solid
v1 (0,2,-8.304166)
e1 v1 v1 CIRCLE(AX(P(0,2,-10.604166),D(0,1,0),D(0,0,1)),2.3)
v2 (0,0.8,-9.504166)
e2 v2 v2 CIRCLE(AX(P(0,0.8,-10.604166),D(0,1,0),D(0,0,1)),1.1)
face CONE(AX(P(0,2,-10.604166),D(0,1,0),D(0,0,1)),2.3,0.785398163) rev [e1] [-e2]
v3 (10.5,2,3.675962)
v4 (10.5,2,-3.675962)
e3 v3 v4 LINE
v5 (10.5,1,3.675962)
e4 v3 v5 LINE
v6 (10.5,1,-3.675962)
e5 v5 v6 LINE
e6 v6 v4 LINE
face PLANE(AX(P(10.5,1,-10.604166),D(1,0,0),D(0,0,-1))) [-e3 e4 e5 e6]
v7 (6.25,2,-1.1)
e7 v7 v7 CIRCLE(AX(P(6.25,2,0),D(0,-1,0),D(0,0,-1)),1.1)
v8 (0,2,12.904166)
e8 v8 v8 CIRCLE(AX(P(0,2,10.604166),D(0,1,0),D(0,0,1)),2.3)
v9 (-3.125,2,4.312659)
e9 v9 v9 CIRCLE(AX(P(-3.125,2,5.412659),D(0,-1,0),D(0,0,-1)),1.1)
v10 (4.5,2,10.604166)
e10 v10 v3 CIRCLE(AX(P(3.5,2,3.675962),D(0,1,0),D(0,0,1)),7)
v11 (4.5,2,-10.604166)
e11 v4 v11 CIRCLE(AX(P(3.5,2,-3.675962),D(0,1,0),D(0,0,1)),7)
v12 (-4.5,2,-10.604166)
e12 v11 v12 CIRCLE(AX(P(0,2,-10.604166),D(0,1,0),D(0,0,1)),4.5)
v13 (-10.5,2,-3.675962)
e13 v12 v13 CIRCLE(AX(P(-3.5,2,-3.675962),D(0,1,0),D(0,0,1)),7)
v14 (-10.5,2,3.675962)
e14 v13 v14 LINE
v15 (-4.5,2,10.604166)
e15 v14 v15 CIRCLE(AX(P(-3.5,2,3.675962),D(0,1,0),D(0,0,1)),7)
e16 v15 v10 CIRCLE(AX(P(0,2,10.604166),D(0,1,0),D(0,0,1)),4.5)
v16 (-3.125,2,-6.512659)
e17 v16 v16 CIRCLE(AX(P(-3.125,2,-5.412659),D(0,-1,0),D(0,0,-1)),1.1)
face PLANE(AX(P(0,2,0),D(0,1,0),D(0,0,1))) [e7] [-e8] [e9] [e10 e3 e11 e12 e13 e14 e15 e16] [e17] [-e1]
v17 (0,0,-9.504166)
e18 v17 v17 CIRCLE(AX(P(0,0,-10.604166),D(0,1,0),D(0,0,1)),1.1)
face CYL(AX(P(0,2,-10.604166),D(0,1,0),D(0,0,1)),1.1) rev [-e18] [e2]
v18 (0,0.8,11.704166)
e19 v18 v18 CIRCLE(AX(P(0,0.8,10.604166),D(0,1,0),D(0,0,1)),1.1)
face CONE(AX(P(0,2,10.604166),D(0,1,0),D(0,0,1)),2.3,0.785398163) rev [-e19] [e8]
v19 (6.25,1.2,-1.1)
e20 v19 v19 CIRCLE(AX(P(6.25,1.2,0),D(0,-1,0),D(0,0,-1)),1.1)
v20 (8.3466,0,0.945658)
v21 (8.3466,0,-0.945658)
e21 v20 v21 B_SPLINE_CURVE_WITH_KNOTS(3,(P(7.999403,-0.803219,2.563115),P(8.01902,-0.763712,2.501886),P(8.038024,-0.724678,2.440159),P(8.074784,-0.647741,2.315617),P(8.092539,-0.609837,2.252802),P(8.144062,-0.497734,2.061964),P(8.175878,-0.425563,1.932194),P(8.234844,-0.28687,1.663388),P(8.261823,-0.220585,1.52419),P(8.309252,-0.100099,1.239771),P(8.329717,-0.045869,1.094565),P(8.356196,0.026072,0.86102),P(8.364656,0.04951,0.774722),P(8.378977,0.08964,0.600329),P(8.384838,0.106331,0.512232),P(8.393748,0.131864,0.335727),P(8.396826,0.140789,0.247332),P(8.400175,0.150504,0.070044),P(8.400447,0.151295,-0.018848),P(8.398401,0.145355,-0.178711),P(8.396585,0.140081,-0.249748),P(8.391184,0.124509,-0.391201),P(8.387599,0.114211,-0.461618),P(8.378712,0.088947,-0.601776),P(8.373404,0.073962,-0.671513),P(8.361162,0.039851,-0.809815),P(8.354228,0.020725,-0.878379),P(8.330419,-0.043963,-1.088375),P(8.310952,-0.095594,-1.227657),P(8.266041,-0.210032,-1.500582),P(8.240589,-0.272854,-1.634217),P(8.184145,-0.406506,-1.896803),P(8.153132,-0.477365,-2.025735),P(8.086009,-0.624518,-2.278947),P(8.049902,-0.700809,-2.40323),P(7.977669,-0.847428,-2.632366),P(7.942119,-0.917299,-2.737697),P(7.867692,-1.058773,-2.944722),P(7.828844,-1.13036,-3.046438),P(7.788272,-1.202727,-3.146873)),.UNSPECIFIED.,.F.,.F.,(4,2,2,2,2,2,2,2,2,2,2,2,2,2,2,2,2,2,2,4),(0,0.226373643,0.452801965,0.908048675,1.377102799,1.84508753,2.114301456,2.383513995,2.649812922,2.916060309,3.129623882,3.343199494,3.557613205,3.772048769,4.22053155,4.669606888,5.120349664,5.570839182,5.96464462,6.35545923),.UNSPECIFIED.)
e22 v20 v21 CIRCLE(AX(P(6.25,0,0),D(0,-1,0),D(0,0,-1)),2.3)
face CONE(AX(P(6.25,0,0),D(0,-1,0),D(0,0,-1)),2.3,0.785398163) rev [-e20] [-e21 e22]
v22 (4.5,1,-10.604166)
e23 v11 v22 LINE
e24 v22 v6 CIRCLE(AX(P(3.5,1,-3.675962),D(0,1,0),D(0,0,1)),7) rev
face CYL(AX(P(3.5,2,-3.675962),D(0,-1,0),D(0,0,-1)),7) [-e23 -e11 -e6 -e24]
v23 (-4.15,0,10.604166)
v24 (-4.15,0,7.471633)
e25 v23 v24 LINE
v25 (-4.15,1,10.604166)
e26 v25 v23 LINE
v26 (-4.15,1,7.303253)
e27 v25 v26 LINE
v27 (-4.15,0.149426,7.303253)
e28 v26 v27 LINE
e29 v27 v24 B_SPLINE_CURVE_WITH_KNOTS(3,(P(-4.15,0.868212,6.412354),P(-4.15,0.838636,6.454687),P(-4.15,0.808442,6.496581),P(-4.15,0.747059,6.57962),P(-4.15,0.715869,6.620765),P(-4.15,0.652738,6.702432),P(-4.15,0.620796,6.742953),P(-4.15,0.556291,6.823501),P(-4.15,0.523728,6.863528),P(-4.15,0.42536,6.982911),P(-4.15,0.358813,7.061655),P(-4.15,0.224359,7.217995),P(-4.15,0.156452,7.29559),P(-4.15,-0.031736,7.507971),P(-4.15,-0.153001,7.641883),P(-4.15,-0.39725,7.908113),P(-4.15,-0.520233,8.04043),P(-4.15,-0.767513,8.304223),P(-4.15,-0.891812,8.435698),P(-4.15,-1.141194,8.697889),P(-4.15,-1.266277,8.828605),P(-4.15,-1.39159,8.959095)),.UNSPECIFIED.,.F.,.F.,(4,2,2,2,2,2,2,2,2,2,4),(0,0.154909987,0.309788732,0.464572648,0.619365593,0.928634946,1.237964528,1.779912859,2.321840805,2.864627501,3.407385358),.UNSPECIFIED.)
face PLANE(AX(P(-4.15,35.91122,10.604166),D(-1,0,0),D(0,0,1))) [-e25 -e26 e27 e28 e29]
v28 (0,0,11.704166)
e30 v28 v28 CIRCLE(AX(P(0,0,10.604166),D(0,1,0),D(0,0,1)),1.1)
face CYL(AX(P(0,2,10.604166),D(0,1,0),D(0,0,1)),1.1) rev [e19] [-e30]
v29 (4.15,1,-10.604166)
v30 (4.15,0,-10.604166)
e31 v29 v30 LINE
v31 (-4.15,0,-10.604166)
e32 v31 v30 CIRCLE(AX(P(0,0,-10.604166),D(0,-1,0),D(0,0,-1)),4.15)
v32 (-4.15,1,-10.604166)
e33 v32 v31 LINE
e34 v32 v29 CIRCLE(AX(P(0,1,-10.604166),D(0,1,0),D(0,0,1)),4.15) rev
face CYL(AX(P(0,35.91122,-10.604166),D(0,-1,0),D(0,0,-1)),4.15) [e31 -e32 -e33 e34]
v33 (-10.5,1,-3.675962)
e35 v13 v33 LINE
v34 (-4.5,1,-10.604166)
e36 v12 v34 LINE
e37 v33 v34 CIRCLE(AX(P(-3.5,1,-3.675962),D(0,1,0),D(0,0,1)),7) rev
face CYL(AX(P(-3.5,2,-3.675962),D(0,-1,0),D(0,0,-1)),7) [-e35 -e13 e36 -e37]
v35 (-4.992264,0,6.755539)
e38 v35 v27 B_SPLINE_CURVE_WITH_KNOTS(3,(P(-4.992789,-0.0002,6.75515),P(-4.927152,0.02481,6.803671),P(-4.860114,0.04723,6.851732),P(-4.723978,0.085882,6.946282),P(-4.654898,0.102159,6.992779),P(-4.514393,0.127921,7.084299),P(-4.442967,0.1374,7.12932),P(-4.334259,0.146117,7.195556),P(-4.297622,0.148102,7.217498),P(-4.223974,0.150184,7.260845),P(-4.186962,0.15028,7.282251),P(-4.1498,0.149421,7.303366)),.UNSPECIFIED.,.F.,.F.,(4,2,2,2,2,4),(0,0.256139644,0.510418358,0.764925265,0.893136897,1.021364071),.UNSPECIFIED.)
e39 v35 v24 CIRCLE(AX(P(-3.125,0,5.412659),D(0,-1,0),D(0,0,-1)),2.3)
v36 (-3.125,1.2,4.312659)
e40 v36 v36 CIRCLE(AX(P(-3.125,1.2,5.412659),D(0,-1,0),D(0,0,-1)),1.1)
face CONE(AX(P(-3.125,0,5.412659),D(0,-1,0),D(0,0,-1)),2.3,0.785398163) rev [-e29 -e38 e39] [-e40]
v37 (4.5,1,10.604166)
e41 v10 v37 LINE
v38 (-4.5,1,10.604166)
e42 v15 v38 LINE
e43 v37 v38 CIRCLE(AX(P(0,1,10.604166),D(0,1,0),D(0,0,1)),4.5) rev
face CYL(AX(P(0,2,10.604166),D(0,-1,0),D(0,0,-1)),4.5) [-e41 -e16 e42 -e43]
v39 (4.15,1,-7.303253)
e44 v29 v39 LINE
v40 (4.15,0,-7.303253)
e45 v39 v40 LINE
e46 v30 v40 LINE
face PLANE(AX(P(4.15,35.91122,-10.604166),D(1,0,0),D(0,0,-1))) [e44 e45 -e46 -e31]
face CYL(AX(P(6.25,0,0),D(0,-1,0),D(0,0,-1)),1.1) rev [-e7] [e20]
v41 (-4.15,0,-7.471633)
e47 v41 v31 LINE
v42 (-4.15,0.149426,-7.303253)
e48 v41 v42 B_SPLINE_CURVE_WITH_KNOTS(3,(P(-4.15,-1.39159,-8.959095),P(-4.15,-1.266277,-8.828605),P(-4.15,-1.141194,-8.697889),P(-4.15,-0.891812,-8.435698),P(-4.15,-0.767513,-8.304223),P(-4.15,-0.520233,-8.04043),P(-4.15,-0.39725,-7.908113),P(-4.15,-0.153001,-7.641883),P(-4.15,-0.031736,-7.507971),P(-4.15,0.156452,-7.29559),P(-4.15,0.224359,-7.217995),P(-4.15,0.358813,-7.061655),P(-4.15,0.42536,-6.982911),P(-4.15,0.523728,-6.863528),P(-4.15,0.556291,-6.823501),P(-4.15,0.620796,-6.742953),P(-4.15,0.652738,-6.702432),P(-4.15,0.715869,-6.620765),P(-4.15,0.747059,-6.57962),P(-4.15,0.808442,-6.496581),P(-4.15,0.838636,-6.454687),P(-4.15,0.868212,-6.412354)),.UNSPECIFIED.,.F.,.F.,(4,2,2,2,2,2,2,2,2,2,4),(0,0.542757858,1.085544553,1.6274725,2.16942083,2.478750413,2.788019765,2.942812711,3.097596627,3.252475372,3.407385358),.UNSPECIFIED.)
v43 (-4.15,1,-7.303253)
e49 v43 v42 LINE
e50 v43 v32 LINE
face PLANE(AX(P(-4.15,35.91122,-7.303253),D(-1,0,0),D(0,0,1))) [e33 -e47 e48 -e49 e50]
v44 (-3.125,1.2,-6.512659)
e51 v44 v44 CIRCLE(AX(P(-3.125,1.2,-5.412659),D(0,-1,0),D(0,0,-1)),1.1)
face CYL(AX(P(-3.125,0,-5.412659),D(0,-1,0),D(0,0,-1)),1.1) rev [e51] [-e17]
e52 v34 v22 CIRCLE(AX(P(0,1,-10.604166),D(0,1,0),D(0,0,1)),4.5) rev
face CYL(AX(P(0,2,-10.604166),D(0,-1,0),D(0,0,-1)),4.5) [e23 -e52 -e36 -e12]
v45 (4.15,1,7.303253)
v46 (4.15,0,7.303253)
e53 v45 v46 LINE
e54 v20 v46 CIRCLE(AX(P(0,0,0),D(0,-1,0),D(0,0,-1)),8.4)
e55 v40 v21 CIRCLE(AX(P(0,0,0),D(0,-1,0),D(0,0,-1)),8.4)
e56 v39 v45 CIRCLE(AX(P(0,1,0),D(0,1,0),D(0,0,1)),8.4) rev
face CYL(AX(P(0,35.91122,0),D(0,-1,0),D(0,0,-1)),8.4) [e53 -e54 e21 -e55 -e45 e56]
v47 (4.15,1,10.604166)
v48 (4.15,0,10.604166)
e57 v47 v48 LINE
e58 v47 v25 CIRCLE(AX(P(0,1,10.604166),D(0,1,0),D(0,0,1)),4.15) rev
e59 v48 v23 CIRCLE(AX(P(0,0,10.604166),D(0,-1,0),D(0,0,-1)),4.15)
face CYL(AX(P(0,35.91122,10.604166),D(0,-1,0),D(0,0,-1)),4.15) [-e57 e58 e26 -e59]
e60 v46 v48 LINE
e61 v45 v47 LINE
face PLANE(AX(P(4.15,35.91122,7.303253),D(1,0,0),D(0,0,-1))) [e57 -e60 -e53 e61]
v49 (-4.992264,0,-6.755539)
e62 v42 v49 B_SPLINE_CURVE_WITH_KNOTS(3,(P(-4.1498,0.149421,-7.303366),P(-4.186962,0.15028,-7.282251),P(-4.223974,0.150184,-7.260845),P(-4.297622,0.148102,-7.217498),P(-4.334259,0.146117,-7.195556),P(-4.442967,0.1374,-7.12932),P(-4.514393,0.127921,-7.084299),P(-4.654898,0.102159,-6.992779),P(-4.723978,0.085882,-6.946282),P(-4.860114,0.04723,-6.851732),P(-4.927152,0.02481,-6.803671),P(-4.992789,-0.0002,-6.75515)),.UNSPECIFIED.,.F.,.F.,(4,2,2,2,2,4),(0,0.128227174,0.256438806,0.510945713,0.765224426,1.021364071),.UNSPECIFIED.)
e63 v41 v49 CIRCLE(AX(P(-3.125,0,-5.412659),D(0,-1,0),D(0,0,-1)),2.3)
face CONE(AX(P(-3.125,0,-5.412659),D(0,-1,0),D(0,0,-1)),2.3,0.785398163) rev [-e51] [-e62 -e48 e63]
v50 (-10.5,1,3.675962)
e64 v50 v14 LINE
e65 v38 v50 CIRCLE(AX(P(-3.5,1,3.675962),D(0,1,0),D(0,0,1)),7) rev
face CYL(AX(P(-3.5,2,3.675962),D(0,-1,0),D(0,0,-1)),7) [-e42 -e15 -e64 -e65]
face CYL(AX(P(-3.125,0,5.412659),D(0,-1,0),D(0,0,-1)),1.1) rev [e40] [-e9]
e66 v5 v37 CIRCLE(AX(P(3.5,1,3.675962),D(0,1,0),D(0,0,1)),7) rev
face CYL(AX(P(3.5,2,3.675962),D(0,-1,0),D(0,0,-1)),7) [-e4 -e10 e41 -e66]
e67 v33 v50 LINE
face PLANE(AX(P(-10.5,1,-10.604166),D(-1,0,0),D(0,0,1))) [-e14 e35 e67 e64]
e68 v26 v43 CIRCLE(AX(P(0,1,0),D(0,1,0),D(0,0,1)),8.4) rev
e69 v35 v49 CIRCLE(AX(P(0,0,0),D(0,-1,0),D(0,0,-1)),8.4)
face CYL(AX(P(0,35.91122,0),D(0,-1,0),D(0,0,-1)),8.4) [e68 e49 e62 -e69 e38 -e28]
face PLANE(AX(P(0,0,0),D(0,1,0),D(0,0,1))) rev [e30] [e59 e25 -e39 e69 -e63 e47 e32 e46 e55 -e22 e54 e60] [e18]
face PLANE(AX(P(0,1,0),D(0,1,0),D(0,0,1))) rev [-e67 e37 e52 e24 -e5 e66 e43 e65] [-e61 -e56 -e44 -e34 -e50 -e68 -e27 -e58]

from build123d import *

# Parameters (mm, degrees)
BOSS_EXTRUDE1_DEPTH                          = 2
CSK_FOR_M2_COUNTERSUNK_FLAT_HEAD_SCR_4_COUNT = 2
CSK_FOR_M2_COUNTERSUNK_FLAT_HEAD_SCR_4_PITCH = 10.825317547
CSK_FOR_M2_COUNTERSUNK_FLAT_HEAD_SCR_5_COUNT = 2
CSK_FOR_M2_COUNTERSUNK_FLAT_HEAD_SCR_5_PITCH = 10.825317547
BOSS_EXTRUDE2_START                          = -1
BOSS_EXTRUDE2_DEPTH                          = 1
FILLET1_R                                    = 7
CUT_EXTRUDE1_DEPTH                           = 1


# Read off the part's stored shape, not the designer's step: CSK for M2 Countersunk Flat Head Screw1
with BuildPart() as part:
    # Sketch1 → Boss-Extrude1 (new body)
    with BuildSketch(Plane(origin=(0, 0, 0), x_dir=(1, 0, 0), z_dir=(0, 1, 0))):
        with BuildLine():
            Line((4.5, 10.60416551), (4.5, 7.50416551))
            ThreePointArc((4.5, 7.50416551), (8.75, 0), (4.5, -7.50416551))
            Line((4.5, -7.50416551), (4.5, -10.60416551))
            ThreePointArc((4.5, -10.60416551), (0, -15.10416551), (-4.5, -10.60416551))
            Line((-4.5, -10.60416551), (-4.5, -7.50416551))
            ThreePointArc((-4.5, -7.50416551), (-8.75, 0), (-4.5, 7.50416551))
            Line((-4.5, 7.50416551), (-4.5, 10.60416551))
            ThreePointArc((-4.5, 10.60416551), (0, 15.10416551), (4.5, 10.60416551))
        make_face()
    extrude(amount=BOSS_EXTRUDE1_DEPTH)

    # CSK for M2 Countersunk Flat Head Scr 2 → CSK for M2 Countersunk Flat Head Screw1 (revolve, cut)
    with BuildSketch(Plane.XY.offset(10.60416551)):
        Polygon((0, 0), (1.1, 0), (1.1, 0.8), (2.3, 2), (0, 2), align=None)
    revolve(axis=Axis((0, 0, 10.60416551), (0, 1, 0)), mode=Mode.SUBTRACT)

    # CSK for M2 Countersunk Flat Head Scr 3 o → CSK for M2 Countersunk Flat Head Scr 3 (revolve, cut)
    with BuildSketch(Plane.XY.offset(-10.60416551)):
        Polygon((0, 0), (1.1, 0), (1.1, 0.8), (2.3, 2), (0, 2), align=None)
    revolve(axis=Axis((0, 0, -10.60416551), (0, 1, 0)), mode=Mode.SUBTRACT)

    # Sketch6 → CSK for M2 Countersunk Flat Head Screw2 (revolve, cut)
    with BuildSketch(Plane(origin=(6.25, 0, 0), x_dir=(0, 0, -1), z_dir=(1, 0, 0))):
        Polygon((0, 0), (0, 2), (1.1, 2), (1.1, 1.2), (2.3, 0), align=None)
    csk_for_m2_countersunk_flat_head_screw2 = revolve(axis=Axis((6.25, -6.35, 0), (0, 1, 0)), mode=Mode.SUBTRACT)

    # CSK for M2 Countersunk Flat Head Scr 4: CSK for M2 Countersunk Flat Head Screw2 ×2
    with Locations(*[Vector(-0.8660254037844379, 0, -0.5000000000000012) * (i * CSK_FOR_M2_COUNTERSUNK_FLAT_HEAD_SCR_4_PITCH) for i in range(1, CSK_FOR_M2_COUNTERSUNK_FLAT_HEAD_SCR_4_COUNT)]):
        add(csk_for_m2_countersunk_flat_head_screw2, mode=Mode.SUBTRACT)

    # CSK for M2 Countersunk Flat Head Scr 5: CSK for M2 Countersunk Flat Head Screw2 ×2
    with Locations(*[Vector(-0.8660254037844383, 0, 0.5000000000000008) * (i * CSK_FOR_M2_COUNTERSUNK_FLAT_HEAD_SCR_5_PITCH) for i in range(1, CSK_FOR_M2_COUNTERSUNK_FLAT_HEAD_SCR_5_COUNT)]):
        add(csk_for_m2_countersunk_flat_head_screw2, mode=Mode.SUBTRACT)

    # Sketch7 → Boss-Extrude2 (add)
    with BuildSketch(Plane(origin=(0, 2, 0), x_dir=(1, 0, 0), z_dir=(0, 1, 0)).offset(BOSS_EXTRUDE2_START)):
        with BuildLine():
            Line((4.5, 10.60416551), (10.5, 10.60416551))
            Line((10.5, 10.60416551), (10.5, -10.60416551))
            Line((10.5, -10.60416551), (4.5, -10.60416551))
            Line((4.5, -10.60416551), (4.5, -7.50416551))
            ThreePointArc((4.5, -7.50416551), (8.75, 0), (4.5, 7.50416551))
            Line((4.5, 7.50416551), (4.5, 10.60416551))
        make_face()
        with BuildLine():
            Line((-4.5, -7.50416551), (-4.5, -10.60416551))
            Line((-4.5, -10.60416551), (-10.5, -10.60416551))
            Line((-10.5, -10.60416551), (-10.5, 10.60416551))
            Line((-10.5, 10.60416551), (-4.5, 10.60416551))
            Line((-4.5, 10.60416551), (-4.5, 7.50416551))
            ThreePointArc((-4.5, 7.50416551), (-8.75, 0), (-4.5, -7.50416551))
        make_face()
    extrude(amount=BOSS_EXTRUDE2_DEPTH)

    # Fillet1
    # the kernel refuses this fillet: 7 mm, written as the material it takes off along each edge
    with BuildSketch(Plane(origin=(-10.5, -16.320508076, -10.60416551), x_dir=(1, 0, 0), z_dir=(0, 1, 0))) as fillet1_piece_1:
        with BuildLine():
            CenterArc((7, -6.92820323), FILLET1_R, 98.213210702, 81.786789298)
            Line((0, -6.92820323), (-0.14, -6.92820323))
            Line((-0.14, -6.92820323), (-0.14, 0))
            Line((-0.14, 0), (0, 0.14))
            ThreePointArc((0, 0.14), (3, 0.14), (5.98, 0.138564065))
            Line((5.98, 0.138564065), (6, 0))
        make_face()
    extrude(amount=35.641016151, mode=Mode.SUBTRACT)
    with BuildSketch(Plane(origin=(-10.5, -16.320508076, 10.60416551), x_dir=(1, 0, 0), z_dir=(0, 1, 0)), Plane(origin=(10.5, -16.320508076, -10.60416551), x_dir=(-1, 0, 0), z_dir=(0, 1, 0))) as fillet1_piece_2:
        with BuildLine():
            CenterArc((7, 6.92820323), FILLET1_R, 180, 81.786789298)
            Line((0, 6.92820323), (-0.14, 6.92820323))
            Line((-0.14, 6.92820323), (-0.14, 0))
            Line((-0.14, 0), (0, -0.14))
            ThreePointArc((0, -0.14), (3, -0.14), (5.98, -0.138564065))
            Line((5.98, -0.138564065), (6, 0))
        make_face()
    extrude(amount=35.641016151, mode=Mode.SUBTRACT)
    with BuildSketch(Plane(origin=(10.5, -16.320508076, 10.60416551), x_dir=(0, 0, -1), z_dir=(0, 1, 0))) as fillet1_piece_3:
        with BuildLine():
            CenterArc((6.92820323, 7), FILLET1_R, 188.213210702, 81.786789298)
            Line((0, 6), (-0.138564065, 5.98))
            ThreePointArc((-0.138564065, 5.98), (-0.14, 3), (-0.14, 0))
            Line((-0.14, 0), (0, -0.14))
            Line((0, -0.14), (6.92820323, -0.14))
            Line((6.92820323, -0.14), (6.92820323, 0))
        make_face()
    extrude(amount=35.641016151, mode=Mode.SUBTRACT)

    # Sketch8 → Cut-Extrude1 (cut)
    with BuildSketch(Plane.XZ):
        with BuildLine():
            Line((-4.5, -10.60416551), (-4.5, -7.50416551))
            ThreePointArc((-4.5, -7.50416551), (-8.75, 0), (-4.5, 7.50416551))
            Line((-4.5, 7.50416551), (-4.5, 10.60416551))
            ThreePointArc((-4.5, 10.60416551), (0, 15.10416551), (4.5, 10.60416551))
            Line((4.5, 10.60416551), (4.5, 7.50416551))
            ThreePointArc((4.5, 7.50416551), (8.75, 0), (4.5, -7.50416551))
            Line((4.5, -7.50416551), (4.5, -10.60416551))
            ThreePointArc((4.5, -10.60416551), (0, -15.10416551), (-4.5, -10.60416551))
        make_face()
        with BuildLine():
            Line((4.15, 7.3032527), (4.15, 10.60416551))
            ThreePointArc((4.15, 10.60416551), (0, 14.75416551), (-4.15, 10.60416551))
            Line((-4.15, 10.60416551), (-4.15, 7.3032527))
            ThreePointArc((-4.15, 7.3032527), (-8.4, 0), (-4.15, -7.3032527))
            Line((-4.15, -7.3032527), (-4.15, -10.60416551))
            ThreePointArc((-4.15, -10.60416551), (0, -14.75416551), (4.15, -10.60416551))
            Line((4.15, -10.60416551), (4.15, -7.3032527))
            ThreePointArc((4.15, -7.3032527), (8.4, 0), (4.15, 7.3032527))
        make_face(mode=Mode.SUBTRACT)
    extrude(amount=-CUT_EXTRUDE1_DEPTH, mode=Mode.SUBTRACT)


solid = part.part
